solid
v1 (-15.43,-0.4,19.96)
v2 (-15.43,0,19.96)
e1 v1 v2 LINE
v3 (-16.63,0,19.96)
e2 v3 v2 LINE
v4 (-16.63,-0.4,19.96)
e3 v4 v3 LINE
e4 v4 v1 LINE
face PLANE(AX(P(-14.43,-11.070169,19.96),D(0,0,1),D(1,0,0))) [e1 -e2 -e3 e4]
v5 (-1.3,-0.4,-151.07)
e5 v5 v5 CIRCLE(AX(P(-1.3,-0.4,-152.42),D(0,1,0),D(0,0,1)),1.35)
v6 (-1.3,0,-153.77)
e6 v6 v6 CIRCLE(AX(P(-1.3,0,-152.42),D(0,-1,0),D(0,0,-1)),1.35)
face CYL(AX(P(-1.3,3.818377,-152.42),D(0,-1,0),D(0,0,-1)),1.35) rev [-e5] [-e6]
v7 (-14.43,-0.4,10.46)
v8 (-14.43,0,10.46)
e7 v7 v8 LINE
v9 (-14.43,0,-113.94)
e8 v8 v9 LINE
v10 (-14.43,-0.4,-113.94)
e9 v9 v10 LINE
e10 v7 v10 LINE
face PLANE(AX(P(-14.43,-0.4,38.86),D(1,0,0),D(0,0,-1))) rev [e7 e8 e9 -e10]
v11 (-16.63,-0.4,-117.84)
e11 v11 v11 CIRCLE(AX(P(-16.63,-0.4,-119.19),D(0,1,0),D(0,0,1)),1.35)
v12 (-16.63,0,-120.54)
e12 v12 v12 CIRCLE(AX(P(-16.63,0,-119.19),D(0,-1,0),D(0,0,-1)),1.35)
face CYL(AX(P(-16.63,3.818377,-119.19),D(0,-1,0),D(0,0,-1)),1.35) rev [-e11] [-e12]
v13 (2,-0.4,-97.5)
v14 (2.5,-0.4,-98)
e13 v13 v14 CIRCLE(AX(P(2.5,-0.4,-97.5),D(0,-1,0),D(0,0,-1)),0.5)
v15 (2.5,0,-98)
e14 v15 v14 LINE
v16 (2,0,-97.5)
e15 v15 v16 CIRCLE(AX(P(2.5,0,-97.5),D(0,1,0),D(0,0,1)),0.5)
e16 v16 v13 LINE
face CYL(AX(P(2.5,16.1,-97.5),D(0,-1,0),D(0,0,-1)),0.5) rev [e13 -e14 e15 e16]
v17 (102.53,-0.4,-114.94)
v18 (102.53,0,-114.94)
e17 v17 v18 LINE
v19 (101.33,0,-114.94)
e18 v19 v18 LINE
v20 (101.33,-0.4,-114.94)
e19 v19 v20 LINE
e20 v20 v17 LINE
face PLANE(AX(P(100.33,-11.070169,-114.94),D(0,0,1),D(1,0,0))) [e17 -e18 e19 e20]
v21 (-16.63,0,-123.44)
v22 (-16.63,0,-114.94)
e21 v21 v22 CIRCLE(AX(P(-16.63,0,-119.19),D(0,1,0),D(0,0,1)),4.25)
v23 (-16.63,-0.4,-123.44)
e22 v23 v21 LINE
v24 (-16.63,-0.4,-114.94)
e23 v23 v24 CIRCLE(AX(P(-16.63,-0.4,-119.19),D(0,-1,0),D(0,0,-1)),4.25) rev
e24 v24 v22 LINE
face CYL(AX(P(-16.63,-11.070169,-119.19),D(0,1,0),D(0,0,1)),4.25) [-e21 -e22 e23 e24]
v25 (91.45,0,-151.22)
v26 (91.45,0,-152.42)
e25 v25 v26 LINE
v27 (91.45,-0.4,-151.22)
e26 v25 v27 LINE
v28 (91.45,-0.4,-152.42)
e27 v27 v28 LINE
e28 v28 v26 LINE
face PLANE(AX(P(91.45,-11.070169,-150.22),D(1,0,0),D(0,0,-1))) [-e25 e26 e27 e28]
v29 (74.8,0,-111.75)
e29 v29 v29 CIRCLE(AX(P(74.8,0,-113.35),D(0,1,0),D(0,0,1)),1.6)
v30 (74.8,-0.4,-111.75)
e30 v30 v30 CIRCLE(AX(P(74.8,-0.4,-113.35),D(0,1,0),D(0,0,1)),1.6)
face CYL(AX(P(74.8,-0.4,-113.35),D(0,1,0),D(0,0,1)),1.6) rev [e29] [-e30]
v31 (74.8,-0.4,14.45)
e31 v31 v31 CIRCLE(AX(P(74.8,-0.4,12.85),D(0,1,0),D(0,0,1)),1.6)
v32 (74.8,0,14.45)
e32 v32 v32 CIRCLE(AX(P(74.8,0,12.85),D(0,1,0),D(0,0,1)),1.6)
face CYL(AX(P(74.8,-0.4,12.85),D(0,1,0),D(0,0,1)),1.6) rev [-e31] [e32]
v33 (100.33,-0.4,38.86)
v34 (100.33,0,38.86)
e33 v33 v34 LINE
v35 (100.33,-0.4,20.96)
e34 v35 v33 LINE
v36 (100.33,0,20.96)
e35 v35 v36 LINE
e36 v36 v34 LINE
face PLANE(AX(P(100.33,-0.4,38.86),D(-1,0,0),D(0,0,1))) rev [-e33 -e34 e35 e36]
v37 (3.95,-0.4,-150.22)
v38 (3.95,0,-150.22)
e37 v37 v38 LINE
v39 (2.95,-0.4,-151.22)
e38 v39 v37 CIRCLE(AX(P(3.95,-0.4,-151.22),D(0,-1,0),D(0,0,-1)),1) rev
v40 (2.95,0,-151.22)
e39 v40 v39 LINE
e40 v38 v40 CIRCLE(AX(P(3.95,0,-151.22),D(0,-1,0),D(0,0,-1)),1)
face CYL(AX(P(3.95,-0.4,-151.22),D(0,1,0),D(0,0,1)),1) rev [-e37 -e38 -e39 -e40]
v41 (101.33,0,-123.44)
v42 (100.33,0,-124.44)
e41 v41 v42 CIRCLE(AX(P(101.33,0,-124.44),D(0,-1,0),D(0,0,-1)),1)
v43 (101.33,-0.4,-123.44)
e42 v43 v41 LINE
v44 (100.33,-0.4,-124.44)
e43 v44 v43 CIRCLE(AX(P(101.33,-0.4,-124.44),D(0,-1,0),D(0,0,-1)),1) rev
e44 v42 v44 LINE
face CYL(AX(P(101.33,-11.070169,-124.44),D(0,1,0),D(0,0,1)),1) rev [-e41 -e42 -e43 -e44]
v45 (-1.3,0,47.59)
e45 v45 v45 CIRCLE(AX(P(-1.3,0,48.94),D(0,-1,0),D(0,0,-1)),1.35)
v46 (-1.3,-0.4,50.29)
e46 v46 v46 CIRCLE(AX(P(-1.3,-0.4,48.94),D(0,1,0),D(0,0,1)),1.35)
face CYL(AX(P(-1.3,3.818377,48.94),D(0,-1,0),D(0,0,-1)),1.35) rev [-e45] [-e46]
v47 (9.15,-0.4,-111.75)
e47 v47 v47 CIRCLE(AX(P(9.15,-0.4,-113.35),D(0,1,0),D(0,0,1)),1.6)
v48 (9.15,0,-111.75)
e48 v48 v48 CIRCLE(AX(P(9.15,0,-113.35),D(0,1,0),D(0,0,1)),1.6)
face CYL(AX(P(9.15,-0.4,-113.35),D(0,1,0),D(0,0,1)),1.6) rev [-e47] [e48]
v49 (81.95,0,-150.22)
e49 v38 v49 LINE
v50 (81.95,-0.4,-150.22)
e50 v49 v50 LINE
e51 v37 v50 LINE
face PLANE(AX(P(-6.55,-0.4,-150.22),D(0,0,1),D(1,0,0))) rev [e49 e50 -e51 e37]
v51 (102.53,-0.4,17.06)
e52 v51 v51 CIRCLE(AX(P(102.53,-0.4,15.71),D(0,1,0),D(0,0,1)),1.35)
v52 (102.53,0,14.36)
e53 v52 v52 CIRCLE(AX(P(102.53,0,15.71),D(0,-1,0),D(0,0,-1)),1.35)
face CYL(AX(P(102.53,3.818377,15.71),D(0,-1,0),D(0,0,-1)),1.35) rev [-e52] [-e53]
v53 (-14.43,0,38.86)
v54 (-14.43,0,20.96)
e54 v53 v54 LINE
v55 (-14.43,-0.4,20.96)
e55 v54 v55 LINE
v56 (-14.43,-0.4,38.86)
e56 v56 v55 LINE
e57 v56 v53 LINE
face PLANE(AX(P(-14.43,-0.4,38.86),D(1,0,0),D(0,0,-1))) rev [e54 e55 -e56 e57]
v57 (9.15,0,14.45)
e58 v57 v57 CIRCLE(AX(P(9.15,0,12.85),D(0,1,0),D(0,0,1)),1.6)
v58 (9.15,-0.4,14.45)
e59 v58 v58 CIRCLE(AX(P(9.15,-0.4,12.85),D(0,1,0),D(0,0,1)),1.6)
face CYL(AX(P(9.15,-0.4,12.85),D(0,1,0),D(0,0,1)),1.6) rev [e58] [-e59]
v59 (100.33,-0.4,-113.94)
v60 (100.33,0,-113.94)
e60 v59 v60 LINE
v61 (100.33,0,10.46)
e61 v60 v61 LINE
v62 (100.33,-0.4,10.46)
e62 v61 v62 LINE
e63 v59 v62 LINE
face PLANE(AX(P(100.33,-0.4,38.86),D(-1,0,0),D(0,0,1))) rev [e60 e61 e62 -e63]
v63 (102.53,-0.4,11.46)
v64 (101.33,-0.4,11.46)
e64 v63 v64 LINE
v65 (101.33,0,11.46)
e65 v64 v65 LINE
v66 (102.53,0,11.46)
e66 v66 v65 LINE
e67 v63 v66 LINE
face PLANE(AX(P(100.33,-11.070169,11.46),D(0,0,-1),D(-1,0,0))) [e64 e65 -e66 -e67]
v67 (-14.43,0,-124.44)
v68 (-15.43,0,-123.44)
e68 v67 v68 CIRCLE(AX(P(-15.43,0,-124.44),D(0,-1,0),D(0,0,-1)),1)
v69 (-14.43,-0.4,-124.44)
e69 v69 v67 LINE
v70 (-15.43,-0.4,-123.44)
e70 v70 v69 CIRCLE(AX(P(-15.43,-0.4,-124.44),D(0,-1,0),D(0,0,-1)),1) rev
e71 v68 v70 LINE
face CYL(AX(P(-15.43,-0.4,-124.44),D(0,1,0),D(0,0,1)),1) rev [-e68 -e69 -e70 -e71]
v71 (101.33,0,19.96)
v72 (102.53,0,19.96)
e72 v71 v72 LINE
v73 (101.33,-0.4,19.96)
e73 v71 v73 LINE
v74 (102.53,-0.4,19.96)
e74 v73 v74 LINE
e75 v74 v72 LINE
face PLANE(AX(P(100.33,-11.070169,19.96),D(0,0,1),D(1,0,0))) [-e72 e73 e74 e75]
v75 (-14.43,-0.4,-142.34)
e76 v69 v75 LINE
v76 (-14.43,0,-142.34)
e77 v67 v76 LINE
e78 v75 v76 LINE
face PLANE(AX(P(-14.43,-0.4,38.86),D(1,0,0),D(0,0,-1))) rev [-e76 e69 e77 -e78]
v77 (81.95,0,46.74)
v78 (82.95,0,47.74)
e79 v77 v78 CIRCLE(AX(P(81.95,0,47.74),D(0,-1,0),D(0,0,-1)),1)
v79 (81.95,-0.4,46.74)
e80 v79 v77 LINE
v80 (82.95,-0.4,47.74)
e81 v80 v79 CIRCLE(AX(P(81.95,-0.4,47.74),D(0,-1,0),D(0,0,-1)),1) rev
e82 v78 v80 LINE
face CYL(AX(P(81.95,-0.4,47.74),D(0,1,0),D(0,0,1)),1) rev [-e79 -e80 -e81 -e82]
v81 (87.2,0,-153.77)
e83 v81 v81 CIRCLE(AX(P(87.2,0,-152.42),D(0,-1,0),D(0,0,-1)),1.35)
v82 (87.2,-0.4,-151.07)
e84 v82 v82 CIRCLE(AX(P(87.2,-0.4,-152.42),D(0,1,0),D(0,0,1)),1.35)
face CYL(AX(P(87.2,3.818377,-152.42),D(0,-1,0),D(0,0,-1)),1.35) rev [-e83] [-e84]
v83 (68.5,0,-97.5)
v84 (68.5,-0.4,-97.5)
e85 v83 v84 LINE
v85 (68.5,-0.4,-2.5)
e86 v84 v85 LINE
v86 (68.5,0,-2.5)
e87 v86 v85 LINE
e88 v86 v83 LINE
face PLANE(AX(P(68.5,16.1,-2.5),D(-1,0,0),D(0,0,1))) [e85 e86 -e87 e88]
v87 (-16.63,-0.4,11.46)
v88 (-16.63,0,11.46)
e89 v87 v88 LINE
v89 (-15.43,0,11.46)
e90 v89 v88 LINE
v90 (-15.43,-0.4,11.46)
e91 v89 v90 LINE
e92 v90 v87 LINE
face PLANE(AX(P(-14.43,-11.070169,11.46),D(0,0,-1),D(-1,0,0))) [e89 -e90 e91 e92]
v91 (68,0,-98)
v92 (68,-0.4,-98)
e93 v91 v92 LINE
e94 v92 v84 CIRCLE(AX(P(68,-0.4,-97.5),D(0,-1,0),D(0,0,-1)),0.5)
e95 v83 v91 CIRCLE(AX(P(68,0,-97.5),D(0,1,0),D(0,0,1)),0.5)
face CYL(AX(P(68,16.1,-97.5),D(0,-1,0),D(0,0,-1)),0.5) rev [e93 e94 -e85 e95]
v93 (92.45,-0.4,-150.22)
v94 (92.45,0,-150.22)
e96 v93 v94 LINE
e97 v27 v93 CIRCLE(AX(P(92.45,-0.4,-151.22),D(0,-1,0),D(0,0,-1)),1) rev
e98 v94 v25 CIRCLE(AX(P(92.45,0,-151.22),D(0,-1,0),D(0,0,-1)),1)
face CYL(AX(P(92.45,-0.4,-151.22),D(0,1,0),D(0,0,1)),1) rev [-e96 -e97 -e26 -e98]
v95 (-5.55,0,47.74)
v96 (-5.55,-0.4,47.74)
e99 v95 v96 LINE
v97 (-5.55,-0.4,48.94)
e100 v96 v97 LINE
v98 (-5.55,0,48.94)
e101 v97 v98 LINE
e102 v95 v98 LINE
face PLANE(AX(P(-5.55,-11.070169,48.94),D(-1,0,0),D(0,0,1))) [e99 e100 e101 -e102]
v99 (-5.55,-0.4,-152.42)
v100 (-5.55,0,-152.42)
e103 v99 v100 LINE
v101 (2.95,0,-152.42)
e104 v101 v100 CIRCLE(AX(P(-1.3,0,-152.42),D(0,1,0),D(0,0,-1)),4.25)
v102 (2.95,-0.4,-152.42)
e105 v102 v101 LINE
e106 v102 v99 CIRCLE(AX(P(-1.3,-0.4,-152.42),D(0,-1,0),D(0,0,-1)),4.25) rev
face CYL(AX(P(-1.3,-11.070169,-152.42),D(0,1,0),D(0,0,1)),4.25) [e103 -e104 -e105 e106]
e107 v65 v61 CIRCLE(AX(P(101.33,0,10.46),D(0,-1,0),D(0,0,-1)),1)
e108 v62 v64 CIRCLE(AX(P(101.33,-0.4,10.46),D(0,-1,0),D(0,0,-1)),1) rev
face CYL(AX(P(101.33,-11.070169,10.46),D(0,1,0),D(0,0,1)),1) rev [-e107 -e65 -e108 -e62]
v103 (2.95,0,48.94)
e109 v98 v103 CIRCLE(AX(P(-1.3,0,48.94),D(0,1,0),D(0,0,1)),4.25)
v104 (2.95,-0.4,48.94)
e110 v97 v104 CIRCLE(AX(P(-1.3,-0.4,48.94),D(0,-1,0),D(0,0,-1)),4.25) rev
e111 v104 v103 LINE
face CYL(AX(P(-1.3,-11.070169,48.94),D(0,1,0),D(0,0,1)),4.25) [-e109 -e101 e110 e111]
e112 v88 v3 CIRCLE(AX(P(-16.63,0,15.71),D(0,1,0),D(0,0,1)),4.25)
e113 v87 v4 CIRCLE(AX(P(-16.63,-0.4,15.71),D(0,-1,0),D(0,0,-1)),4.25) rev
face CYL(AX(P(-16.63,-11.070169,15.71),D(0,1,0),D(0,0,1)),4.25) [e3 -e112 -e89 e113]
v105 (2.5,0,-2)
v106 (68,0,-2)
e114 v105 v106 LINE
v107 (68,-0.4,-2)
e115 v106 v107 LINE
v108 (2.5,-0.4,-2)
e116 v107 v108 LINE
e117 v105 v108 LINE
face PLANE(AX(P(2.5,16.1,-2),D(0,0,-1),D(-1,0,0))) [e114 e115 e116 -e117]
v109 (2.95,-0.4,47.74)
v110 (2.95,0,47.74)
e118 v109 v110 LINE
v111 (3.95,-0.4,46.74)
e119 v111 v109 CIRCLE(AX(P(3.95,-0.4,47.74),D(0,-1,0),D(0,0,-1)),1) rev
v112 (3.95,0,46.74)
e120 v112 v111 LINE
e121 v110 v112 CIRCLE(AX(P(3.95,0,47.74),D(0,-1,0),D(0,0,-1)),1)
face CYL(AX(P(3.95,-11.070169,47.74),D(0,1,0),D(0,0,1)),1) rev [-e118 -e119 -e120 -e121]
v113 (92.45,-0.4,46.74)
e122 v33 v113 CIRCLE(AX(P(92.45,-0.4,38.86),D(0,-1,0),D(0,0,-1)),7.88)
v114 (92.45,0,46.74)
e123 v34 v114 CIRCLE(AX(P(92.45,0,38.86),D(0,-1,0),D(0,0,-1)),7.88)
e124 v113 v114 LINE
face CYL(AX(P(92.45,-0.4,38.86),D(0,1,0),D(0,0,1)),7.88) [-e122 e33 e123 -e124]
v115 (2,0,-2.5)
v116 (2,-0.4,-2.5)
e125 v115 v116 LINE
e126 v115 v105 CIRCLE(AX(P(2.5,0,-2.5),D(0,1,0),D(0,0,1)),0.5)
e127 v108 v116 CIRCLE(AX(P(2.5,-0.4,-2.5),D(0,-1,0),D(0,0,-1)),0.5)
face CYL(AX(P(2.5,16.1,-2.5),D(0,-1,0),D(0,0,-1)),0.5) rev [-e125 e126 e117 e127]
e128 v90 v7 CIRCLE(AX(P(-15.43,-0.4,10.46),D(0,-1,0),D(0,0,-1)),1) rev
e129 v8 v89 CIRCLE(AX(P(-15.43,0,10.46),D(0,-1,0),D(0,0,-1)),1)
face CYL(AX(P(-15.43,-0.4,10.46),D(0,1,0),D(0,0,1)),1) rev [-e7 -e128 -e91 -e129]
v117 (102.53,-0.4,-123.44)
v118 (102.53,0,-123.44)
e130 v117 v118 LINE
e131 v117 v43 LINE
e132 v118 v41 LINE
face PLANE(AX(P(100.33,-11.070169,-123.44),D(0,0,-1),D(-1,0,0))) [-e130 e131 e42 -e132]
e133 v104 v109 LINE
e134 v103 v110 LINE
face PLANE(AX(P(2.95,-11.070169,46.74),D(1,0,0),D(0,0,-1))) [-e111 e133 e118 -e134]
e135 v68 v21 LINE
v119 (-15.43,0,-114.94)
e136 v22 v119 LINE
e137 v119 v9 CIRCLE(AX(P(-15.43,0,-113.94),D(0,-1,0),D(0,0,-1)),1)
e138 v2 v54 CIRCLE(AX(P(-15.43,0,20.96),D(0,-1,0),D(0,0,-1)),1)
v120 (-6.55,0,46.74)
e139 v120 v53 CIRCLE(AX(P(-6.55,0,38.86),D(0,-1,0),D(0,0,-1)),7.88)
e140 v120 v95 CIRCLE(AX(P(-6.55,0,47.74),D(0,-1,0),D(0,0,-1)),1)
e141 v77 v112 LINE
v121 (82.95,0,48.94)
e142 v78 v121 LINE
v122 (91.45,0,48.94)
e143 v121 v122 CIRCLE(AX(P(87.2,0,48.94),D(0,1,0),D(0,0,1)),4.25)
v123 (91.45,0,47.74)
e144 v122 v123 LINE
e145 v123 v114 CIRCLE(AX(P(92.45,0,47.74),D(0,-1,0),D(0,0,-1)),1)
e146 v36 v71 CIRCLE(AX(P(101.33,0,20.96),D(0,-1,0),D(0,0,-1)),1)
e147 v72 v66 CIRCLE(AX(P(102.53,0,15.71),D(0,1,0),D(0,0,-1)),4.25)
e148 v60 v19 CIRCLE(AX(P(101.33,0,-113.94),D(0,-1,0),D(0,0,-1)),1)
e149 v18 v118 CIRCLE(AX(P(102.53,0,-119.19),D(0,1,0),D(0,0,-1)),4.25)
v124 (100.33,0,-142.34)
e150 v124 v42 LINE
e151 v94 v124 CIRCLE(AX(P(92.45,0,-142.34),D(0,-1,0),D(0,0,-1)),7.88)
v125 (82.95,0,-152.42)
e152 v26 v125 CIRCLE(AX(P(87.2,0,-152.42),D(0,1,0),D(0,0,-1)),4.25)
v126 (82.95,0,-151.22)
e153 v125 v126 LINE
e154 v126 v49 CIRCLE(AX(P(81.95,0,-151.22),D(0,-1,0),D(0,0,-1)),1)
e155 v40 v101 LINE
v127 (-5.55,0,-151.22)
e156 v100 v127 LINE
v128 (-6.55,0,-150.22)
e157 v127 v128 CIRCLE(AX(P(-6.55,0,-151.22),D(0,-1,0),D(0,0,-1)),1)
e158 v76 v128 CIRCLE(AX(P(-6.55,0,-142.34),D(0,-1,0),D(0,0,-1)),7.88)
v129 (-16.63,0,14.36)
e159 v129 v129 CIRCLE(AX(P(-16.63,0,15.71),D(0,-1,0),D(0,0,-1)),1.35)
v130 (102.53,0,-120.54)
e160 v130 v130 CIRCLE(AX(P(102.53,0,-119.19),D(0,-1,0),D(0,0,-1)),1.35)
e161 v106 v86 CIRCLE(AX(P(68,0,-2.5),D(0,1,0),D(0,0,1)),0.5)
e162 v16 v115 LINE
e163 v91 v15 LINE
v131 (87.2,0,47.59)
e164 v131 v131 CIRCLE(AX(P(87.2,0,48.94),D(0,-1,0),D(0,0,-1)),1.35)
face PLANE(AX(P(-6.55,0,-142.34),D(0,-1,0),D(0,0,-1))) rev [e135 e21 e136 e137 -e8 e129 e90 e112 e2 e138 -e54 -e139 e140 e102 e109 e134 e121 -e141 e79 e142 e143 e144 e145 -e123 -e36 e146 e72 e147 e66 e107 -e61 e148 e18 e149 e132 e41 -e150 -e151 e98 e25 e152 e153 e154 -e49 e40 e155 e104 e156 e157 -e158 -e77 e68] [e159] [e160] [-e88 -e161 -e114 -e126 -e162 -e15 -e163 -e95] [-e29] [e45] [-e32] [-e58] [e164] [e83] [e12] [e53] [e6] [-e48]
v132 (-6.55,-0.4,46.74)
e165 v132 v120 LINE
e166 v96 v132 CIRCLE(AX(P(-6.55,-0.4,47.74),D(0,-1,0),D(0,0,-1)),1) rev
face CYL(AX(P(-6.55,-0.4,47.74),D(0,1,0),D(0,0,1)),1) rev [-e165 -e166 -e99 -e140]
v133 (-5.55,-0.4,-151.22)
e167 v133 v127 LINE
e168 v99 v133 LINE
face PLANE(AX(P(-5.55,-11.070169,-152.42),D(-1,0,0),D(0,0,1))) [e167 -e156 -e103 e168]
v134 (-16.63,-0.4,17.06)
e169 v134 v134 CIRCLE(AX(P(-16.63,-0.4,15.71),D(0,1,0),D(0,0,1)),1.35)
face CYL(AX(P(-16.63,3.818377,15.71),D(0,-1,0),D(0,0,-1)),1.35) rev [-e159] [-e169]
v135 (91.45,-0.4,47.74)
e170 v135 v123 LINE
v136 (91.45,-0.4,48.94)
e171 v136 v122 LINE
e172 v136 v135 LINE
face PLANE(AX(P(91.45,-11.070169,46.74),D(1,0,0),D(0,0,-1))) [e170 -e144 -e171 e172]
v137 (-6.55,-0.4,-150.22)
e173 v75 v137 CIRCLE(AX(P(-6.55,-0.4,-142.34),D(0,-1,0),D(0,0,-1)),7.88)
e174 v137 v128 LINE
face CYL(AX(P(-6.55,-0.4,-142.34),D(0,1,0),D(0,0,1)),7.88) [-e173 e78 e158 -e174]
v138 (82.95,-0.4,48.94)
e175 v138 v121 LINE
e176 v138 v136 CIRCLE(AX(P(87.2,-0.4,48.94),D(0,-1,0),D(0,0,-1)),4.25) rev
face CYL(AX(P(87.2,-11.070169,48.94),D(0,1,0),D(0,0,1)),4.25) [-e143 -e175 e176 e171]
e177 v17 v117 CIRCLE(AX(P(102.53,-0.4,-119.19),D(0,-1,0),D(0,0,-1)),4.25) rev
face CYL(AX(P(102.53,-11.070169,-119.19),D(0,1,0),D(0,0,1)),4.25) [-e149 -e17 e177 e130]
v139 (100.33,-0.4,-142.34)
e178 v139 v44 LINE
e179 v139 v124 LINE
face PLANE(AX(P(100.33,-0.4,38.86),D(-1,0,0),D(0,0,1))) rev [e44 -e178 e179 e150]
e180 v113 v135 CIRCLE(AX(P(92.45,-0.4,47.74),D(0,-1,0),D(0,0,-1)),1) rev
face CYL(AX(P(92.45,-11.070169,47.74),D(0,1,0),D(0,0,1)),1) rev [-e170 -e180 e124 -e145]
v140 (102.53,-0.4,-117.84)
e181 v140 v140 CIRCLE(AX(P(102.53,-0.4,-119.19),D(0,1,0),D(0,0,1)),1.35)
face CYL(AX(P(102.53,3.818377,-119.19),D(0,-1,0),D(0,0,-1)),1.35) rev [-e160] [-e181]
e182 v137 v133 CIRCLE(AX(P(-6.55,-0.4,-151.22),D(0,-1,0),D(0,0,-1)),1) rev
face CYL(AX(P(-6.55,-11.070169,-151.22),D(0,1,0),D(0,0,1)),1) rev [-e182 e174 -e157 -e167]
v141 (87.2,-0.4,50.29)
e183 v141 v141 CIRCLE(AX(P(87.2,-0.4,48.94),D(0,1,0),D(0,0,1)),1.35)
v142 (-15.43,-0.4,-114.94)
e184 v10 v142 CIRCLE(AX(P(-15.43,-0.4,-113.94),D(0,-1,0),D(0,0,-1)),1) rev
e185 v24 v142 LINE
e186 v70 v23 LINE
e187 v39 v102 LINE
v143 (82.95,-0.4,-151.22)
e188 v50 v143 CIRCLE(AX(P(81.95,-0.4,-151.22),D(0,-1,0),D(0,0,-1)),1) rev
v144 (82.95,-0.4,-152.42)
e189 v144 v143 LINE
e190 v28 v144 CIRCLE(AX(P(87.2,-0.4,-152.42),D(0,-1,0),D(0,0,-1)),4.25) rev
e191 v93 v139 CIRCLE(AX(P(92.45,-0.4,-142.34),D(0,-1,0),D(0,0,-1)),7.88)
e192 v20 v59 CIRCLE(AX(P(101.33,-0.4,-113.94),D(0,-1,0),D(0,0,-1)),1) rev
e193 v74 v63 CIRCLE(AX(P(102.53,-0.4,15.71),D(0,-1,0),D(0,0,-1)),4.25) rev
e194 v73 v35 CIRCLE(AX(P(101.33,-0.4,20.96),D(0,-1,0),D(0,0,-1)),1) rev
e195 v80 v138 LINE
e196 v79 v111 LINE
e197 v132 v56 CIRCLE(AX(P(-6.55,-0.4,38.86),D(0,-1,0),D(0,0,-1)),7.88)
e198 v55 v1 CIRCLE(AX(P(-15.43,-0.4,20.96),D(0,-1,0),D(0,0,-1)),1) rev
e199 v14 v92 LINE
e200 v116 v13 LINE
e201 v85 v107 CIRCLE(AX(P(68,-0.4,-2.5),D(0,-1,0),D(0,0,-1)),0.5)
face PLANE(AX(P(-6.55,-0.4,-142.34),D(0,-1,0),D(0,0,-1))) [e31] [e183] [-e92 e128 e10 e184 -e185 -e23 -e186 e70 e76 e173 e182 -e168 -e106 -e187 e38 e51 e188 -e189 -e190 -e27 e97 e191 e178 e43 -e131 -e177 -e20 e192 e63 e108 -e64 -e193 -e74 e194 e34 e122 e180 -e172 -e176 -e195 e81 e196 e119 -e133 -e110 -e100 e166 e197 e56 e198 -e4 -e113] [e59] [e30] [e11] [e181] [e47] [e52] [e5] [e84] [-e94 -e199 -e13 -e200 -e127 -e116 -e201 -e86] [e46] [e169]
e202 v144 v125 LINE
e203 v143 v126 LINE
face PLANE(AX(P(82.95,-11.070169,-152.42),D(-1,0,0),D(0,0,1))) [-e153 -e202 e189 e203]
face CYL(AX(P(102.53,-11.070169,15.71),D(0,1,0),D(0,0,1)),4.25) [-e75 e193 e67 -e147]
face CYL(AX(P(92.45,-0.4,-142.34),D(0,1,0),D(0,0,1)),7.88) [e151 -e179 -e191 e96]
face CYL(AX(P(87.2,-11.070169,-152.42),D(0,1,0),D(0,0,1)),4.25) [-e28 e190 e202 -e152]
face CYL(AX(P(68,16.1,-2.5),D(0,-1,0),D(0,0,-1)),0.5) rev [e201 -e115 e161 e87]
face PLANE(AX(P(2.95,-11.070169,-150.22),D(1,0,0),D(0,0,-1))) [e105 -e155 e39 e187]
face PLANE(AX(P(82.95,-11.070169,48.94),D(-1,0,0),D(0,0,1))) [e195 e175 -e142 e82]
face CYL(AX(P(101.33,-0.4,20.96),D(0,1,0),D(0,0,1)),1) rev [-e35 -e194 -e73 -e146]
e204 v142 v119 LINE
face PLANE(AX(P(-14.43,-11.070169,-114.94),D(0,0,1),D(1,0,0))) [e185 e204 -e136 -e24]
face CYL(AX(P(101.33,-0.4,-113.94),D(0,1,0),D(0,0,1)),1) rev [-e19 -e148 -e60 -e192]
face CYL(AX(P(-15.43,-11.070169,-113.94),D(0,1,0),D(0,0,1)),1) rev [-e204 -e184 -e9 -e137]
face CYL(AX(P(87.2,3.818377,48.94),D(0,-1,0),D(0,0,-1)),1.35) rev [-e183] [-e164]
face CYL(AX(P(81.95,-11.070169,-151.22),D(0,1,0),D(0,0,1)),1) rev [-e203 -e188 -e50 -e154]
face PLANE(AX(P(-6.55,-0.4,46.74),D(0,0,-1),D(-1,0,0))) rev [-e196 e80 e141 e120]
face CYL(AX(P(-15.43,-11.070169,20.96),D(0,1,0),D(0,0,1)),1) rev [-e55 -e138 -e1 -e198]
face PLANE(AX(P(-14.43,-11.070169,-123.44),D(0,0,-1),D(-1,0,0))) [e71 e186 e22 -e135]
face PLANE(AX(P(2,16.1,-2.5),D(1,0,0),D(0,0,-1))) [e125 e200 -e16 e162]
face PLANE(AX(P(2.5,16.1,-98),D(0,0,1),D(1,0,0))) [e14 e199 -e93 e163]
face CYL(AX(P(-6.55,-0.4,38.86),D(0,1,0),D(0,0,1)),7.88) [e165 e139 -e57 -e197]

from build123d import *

# Parameters (mm, degrees)
BASE_DEPTH             = 16.1
SHELL_T                = -2
SCREEN_START           = 0.4
SCREEN_BASE_DEPTH      = 0.4
SKETCH21_R             = 1.6
LEG_HOLES_DEPTH        = 182.359773103
SCREEN_CLAMPS_DEPTH    = 0.4
SCREEN_CLAMP_FILLETS_R = 1
SKETCH23_R             = 1.35
CUT_EXTRUDE1_DEPTH     = 0.4
CUT_EXTRUDE2_DEPTH     = 191.280496373


with BuildPart() as part:
    # Sketch2 → Base (new body)
    with BuildSketch(Plane(origin=(0, 0, 0), x_dir=(1, 0, 0), z_dir=(0, 1, 0))):
        with BuildLine():
            Line((2.5, 0), (68, 0))
            ThreePointArc((68, 0), (69.767766953, 0.732233047), (70.5, 2.5))
            Line((70.5, 2.5), (70.5, 97.5))
            ThreePointArc((70.5, 97.5), (69.767766953, 99.267766953), (68, 100))
            Line((68, 100), (2.5, 100))
            ThreePointArc((2.5, 100), (0.732233047, 99.267766953), (0, 97.5))
            Line((0, 97.5), (0, 2.5))
            ThreePointArc((0, 2.5), (0.732233047, 0.732233047), (2.5, 0))
        make_face()
    extrude(amount=BASE_DEPTH)

    # Shell
    shell_openings = [part.faces().sort_by_distance(p)[0] for p in [
        (35.25, 16.1, -50),
        (35.25, 0, -50),
    ]]
    offset(amount=SHELL_T, openings=shell_openings, kind=Kind.INTERSECTION)

    # Sketch19 → Screen Base (add)
    with BuildSketch(Plane.XZ.offset(SCREEN_START)):
        with BuildLine():
            Line((-6.55, 46.74), (92.45, 46.74))
            ThreePointArc((92.45, 46.74), (98.022001436, 44.432001436), (100.33, 38.86))
            Line((100.33, 38.86), (100.33, -142.34))
            ThreePointArc((100.33, -142.34), (98.022001436, -147.912001436), (92.45, -150.22))
            Line((92.45, -150.22), (-6.55, -150.22))
            ThreePointArc((-6.55, -150.22), (-12.122001436, -147.912001436), (-14.43, -142.34))
            Line((-14.43, -142.34), (-14.43, 38.86))
            ThreePointArc((-14.43, 38.86), (-12.122001436, 44.432001436), (-6.55, 46.74))
        make_face()
        with BuildLine():
            Line((2.5, -98), (68, -98))
            ThreePointArc((68, -98), (68.353553391, -97.853553391), (68.5, -97.5))
            Line((68.5, -97.5), (68.5, -2.5))
            ThreePointArc((68.5, -2.5), (68.353553391, -2.146446609), (68, -2))
            Line((68, -2), (2.5, -2))
            ThreePointArc((2.5, -2), (2.146446609, -2.146446609), (2, -2.5))
            Line((2, -2.5), (2, -97.5))
            ThreePointArc((2, -97.5), (2.146446609, -97.853553391), (2.5, -98))
        make_face(mode=Mode.SUBTRACT)
    extrude(amount=-SCREEN_BASE_DEPTH)

    # Sketch21 → Leg Holes (cut, through all)
    with BuildSketch(Plane(origin=(0, 0, 0), x_dir=(1, 0, 0), z_dir=(0, 1, 0))):
        with Locations(Location((9.15, 113.35, 0), (0, 0, 270))):
            Circle(SKETCH21_R)
        with Locations(Location((74.8, 113.35, 0), (0, 0, 270))):
            Circle(SKETCH21_R)
        with Locations(Location((74.8, -12.85, 0), (0, 0, 270))):
            Circle(SKETCH21_R)
        with Locations(Location((9.15, -12.85, 0), (0, 0, 270))):
            Circle(SKETCH21_R)
    extrude(amount=-LEG_HOLES_DEPTH, mode=Mode.SUBTRACT)

    # Sketch22 → Screen Clamps (add)
    with BuildSketch(Plane(origin=(0, 0, 0), x_dir=(1, 0, 0), z_dir=(0, 1, 0))):
        with BuildLine():
            Line((-5.55, 152.42), (-5.55, 150.22))
            Line((-5.55, 150.22), (2.95, 150.22))
            Line((2.95, 150.22), (2.95, 152.42))
            ThreePointArc((2.95, 152.42), (-1.3, 156.67), (-5.55, 152.42))
        make_face()
        with BuildLine():
            Line((82.95, 152.42), (82.95, 150.22))
            Line((82.95, 150.22), (91.45, 150.22))
            Line((91.45, 150.22), (91.45, 152.42))
            ThreePointArc((91.45, 152.42), (87.2, 156.67), (82.95, 152.42))
        make_face()
        with BuildLine():
            Line((-5.55, -48.94), (-5.55, -46.74))
            Line((-5.55, -46.74), (2.95, -46.74))
            Line((2.95, -46.74), (2.95, -48.94))
            ThreePointArc((2.95, -48.94), (-1.3, -53.19), (-5.55, -48.94))
        make_face()
        with BuildLine():
            Line((82.95, -48.94), (82.95, -46.74))
            Line((82.95, -46.74), (91.45, -46.74))
            Line((91.45, -46.74), (91.45, -48.94))
            ThreePointArc((91.45, -48.94), (87.2, -53.19), (82.95, -48.94))
        make_face()
        with BuildLine():
            Line((-14.43, 123.44), (-16.63, 123.44))
            ThreePointArc((-16.63, 123.44), (-20.88, 119.19), (-16.63, 114.94))
            Line((-16.63, 114.94), (-14.43, 114.94))
            Line((-14.43, 114.94), (-14.43, 123.44))
        make_face()
        with BuildLine():
            Line((-14.43, -11.46), (-16.63, -11.46))
            ThreePointArc((-16.63, -11.46), (-20.88, -15.71), (-16.63, -19.96))
            Line((-16.63, -19.96), (-14.43, -19.96))
            Line((-14.43, -19.96), (-14.43, -11.46))
        make_face()
        with BuildLine():
            Line((100.33, -11.46), (102.53, -11.46))
            ThreePointArc((102.53, -11.46), (106.78, -15.71), (102.53, -19.96))
            Line((102.53, -19.96), (100.33, -19.96))
            Line((100.33, -19.96), (100.33, -11.46))
        make_face()
        with BuildLine():
            Line((100.33, 123.44), (102.53, 123.44))
            ThreePointArc((102.53, 123.44), (106.78, 119.19), (102.53, 114.94))
            Line((102.53, 114.94), (100.33, 114.94))
            Line((100.33, 114.94), (100.33, 123.44))
        make_face()
    extrude(amount=-SCREEN_CLAMPS_DEPTH)

    # Screen Clamp Fillets
    screen_clamp_fillets_edges = [part.edges().sort_by_distance(p)[0] for p in [
        (-5.55, -0.2, -150.22),
        (2.95, -0.2, -150.22),
        (82.95, -0.2, -150.22),
        (91.45, -0.2, -150.22),
        (2.95, -0.2, 46.74),
        (-5.55, -0.2, 46.74),
        (91.45, -0.2, 46.74),
        (82.95, -0.2, 46.74),
        (-14.43, -0.2, -114.94),
        (-14.43, -0.2, -123.44),
        (-14.43, -0.2, 19.96),
        (-14.43, -0.2, 11.46),
        (100.33, -0.2, 11.46),
        (100.33, -0.2, 19.96),
        (100.33, -0.2, -123.44),
        (100.33, -0.2, -114.94),
    ]]
    fillet(screen_clamp_fillets_edges, radius=SCREEN_CLAMP_FILLETS_R - 0.0001)  # a hair under: the kernel refuses the full size

    # Sketch23 → Cut-Extrude1 (cut)
    with BuildSketch(Plane(origin=(0, -0.4, 0), x_dir=(1, 0, 0), z_dir=(0, 1, 0))):
        with Locations(Location((-1.3, 152.42, 0), (0, 0, 90))):
            Circle(SKETCH23_R)
        with Locations(Location((87.2, 152.42, 0), (0, 0, 90))):
            Circle(SKETCH23_R)
        with Locations(Location((-1.3, -48.94, 0), (0, 0, 90))):
            Circle(SKETCH23_R)
        with Locations(Location((87.2, -48.94, 0), (0, 0, 90))):
            Circle(SKETCH23_R)
        with Locations(Location((-16.63, 119.19, 0), (0, 0, 90))):
            Circle(SKETCH23_R)
        with Locations(Location((102.53, 119.19, 0), (0, 0, 90))):
            Circle(SKETCH23_R)
        with Locations(Location((102.53, -15.71, 0), (0, 0, 90))):
            Circle(SKETCH23_R)
        with Locations(Location((-16.63, -15.71, 0), (0, 0, 90))):
            Circle(SKETCH23_R)
    extrude(amount=CUT_EXTRUDE1_DEPTH, mode=Mode.SUBTRACT)

    # Sketch24 → Cut-Extrude2 (cut, through all)
    with BuildSketch(Plane(origin=(0, 0, 0), x_dir=(1, 0, 0), z_dir=(0, 1, 0))):
        with BuildLine():
            Line((-16.63, 114.94), (-15.43, 114.94))
            ThreePointArc((-15.43, 114.94), (-14.722893219, 114.647106781), (-14.43, 113.94))
            Line((-14.43, 113.94), (-14.43, -10.46))
            ThreePointArc((-14.43, -10.46), (-14.722893219, -11.167106781), (-15.43, -11.46))
            Line((-15.43, -11.46), (-16.63, -11.46))
            ThreePointArc((-16.63, -11.46), (-20.88, -15.71), (-16.63, -19.96))
            Line((-16.63, -19.96), (-15.43, -19.96))
            ThreePointArc((-15.43, -19.96), (-14.722893219, -20.252893219), (-14.43, -20.96))
            Line((-14.43, -20.96), (-14.43, -38.86))
            ThreePointArc((-14.43, -38.86), (-12.122001436, -44.432001436), (-6.55, -46.74))
            ThreePointArc((-6.55, -46.74), (-5.842893219, -47.032893219), (-5.55, -47.74))
            Line((-5.55, -47.74), (-5.55, -48.94))
            ThreePointArc((-5.55, -48.94), (-1.3, -53.19), (2.95, -48.94))
            Line((2.95, -48.94), (2.95, -47.74))
            ThreePointArc((2.95, -47.74), (3.242893219, -47.032893219), (3.95, -46.74))
            Line((3.95, -46.74), (81.95, -46.74))
            ThreePointArc((81.95, -46.74), (82.657106781, -47.032893219), (82.95, -47.74))
            Line((82.95, -47.74), (82.95, -48.94))
            ThreePointArc((82.95, -48.94), (87.2, -53.19), (91.45, -48.94))
            Line((91.45, -48.94), (91.45, -47.74))
            ThreePointArc((91.45, -47.74), (91.742893219, -47.032893219), (92.45, -46.74))
            ThreePointArc((92.45, -46.74), (98.022001436, -44.432001436), (100.33, -38.86))
            Line((100.33, -38.86), (100.33, -20.96))
            ThreePointArc((100.33, -20.96), (100.622893219, -20.252893219), (101.33, -19.96))
            Line((101.33, -19.96), (102.53, -19.96))
            ThreePointArc((102.53, -19.96), (106.78, -15.71), (102.53, -11.46))
            Line((102.53, -11.46), (101.33, -11.46))
            ThreePointArc((101.33, -11.46), (100.622893219, -11.167106781), (100.33, -10.46))
            Line((100.33, -10.46), (100.33, 113.94))
            ThreePointArc((100.33, 113.94), (100.622893219, 114.647106781), (101.33, 114.94))
            Line((101.33, 114.94), (102.53, 114.94))
            ThreePointArc((102.53, 114.94), (106.78, 119.19), (102.53, 123.44))
            Line((102.53, 123.44), (101.33, 123.44))
            ThreePointArc((101.33, 123.44), (100.622893219, 123.732893219), (100.33, 124.44))
            Line((100.33, 124.44), (100.33, 142.34))
            ThreePointArc((100.33, 142.34), (98.022001436, 147.912001436), (92.45, 150.22))
            ThreePointArc((92.45, 150.22), (91.742893219, 150.512893219), (91.45, 151.22))
            Line((91.45, 151.22), (91.45, 152.42))
            ThreePointArc((91.45, 152.42), (87.2, 156.67), (82.95, 152.42))
            Line((82.95, 152.42), (82.95, 151.22))
            ThreePointArc((82.95, 151.22), (82.657106781, 150.512893219), (81.95, 150.22))
            Line((81.95, 150.22), (3.95, 150.22))
            ThreePointArc((3.95, 150.22), (3.242893219, 150.512893219), (2.95, 151.22))
            Line((2.95, 151.22), (2.95, 152.42))
            ThreePointArc((2.95, 152.42), (-1.3, 156.67), (-5.55, 152.42))
            Line((-5.55, 152.42), (-5.55, 151.22))
            ThreePointArc((-5.55, 151.22), (-5.842893219, 150.512893219), (-6.55, 150.22))
            ThreePointArc((-6.55, 150.22), (-12.122001436, 147.912001436), (-14.43, 142.34))
            Line((-14.43, 142.34), (-14.43, 124.44))
            ThreePointArc((-14.43, 124.44), (-14.722893219, 123.732893219), (-15.43, 123.44))
            Line((-15.43, 123.44), (-16.63, 123.44))
            ThreePointArc((-16.63, 123.44), (-20.88, 119.19), (-16.63, 114.94))
        make_face()
    extrude(amount=CUT_EXTRUDE2_DEPTH, mode=Mode.SUBTRACT)


solid = part.part
